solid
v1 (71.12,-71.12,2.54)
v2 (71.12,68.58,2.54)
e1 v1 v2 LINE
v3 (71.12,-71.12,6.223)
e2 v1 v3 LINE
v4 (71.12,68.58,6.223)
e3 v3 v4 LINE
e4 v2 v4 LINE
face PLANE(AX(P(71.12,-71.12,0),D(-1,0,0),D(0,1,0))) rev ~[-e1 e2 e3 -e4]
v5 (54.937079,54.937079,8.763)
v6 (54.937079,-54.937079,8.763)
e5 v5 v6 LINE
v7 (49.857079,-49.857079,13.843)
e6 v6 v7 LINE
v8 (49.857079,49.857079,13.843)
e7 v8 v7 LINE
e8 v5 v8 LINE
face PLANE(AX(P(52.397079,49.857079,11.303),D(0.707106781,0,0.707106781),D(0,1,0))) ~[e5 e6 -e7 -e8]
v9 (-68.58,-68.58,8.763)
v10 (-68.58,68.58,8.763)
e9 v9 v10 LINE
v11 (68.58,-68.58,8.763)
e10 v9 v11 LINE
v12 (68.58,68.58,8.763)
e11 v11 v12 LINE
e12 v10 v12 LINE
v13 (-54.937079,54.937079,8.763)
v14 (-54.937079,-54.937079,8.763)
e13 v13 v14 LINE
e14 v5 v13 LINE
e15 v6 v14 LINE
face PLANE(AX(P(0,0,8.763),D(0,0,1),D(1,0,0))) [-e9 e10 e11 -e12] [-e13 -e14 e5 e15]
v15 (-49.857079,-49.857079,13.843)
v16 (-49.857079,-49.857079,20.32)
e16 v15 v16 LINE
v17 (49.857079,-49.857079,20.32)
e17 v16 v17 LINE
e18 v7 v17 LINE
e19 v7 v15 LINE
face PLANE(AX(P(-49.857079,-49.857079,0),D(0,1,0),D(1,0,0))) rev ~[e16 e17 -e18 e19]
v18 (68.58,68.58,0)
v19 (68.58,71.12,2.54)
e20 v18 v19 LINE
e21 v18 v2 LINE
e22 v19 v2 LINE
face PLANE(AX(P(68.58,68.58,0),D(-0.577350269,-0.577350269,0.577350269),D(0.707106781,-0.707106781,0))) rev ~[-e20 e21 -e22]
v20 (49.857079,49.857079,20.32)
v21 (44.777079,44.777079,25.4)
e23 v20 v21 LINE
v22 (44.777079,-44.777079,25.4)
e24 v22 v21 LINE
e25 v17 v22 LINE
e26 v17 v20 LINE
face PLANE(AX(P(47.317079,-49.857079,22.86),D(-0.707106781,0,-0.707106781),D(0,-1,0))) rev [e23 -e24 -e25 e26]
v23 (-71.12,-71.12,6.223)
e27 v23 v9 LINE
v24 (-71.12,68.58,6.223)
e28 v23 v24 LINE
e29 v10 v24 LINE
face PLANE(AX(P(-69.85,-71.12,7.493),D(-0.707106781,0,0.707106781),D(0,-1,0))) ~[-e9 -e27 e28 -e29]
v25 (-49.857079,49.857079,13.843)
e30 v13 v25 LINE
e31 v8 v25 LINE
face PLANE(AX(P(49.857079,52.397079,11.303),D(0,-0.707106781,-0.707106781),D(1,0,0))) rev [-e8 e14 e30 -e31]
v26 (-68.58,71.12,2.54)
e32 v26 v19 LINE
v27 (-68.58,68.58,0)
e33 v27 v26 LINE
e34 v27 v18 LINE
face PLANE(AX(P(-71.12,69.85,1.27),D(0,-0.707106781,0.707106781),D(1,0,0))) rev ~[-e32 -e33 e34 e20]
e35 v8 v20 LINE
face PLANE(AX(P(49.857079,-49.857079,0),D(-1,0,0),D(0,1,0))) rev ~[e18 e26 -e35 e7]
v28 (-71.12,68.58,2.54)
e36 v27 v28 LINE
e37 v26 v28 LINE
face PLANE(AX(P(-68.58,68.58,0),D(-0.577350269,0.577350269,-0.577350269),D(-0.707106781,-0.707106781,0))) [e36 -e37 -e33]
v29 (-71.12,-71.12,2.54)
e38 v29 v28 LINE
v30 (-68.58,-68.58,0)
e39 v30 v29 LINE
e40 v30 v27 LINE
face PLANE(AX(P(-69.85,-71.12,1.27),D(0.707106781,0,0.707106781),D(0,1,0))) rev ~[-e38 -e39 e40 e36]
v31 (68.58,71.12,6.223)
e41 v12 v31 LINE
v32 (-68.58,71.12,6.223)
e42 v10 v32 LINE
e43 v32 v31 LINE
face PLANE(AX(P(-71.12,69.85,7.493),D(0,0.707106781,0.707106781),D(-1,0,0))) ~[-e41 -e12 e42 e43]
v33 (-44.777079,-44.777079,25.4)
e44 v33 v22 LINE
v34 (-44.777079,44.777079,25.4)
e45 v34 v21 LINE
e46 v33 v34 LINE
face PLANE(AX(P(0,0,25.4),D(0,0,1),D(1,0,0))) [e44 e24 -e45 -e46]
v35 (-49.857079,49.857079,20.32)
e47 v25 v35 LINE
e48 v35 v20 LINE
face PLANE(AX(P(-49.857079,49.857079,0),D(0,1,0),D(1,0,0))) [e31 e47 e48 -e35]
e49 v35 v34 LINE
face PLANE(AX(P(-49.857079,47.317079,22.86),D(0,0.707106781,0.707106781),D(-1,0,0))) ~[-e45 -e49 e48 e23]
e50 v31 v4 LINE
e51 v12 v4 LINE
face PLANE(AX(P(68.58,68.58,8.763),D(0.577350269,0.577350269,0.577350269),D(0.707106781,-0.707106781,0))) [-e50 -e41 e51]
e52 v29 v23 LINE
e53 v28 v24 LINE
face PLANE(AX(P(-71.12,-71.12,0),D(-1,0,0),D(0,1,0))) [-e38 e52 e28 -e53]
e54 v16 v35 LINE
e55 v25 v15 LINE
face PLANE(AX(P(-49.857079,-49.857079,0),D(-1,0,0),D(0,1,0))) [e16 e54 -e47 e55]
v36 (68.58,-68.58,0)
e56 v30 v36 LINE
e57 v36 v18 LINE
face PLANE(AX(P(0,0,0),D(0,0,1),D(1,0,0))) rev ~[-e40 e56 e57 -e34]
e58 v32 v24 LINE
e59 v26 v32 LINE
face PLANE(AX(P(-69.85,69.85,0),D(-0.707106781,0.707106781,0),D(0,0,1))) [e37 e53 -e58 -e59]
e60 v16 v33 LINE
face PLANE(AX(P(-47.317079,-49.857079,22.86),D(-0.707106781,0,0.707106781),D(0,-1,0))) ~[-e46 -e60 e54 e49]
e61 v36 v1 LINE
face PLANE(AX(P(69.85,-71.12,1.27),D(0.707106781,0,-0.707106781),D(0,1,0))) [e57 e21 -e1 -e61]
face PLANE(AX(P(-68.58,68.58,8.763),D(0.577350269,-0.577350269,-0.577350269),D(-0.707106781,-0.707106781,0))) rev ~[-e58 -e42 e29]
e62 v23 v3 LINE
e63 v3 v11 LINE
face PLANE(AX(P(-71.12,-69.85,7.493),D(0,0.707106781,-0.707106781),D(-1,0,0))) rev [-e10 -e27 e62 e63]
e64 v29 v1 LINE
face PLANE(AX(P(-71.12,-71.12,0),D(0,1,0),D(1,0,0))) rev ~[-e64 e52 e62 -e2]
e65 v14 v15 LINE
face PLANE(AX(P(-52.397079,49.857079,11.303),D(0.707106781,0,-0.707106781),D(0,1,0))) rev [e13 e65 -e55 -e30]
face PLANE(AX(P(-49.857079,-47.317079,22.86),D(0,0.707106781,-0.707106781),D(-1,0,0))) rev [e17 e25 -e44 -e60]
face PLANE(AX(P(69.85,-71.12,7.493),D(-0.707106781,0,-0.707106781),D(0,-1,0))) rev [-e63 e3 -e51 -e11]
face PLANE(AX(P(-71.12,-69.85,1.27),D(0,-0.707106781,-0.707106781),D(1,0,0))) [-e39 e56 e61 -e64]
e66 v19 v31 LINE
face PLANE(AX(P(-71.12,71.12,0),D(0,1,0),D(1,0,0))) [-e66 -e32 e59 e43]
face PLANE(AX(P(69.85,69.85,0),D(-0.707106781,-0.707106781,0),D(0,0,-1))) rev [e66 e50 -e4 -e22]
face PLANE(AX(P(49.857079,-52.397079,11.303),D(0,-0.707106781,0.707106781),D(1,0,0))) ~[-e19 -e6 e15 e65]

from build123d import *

# Parameters (mm, degrees)
F0_W     = 142.24
F0_H     = 142.24
F1_DEPTH = 8.763
F2_W     = 99.7141572639
F2_H     = 99.7141572639
F3_DEPTH = 25.4
F4_SIZE  = 2.54
F5_SIZE  = 5.08


with BuildPart() as f1:
    # F0 (on Top) → F1 (new body)
    with BuildSketch(Plane.XY):
        Rectangle(F0_W, F0_H)
    extrude(amount=F1_DEPTH)

    # F2 (on Top) → F3 (join)
    with BuildSketch(Plane.XY):
        Rectangle(F2_W, F2_H)
    extrude(amount=F3_DEPTH)

    # F4
    f4_edges = [f1.edges().sort_by_distance(p)[0] for p in [
        (71.12, 71.12, 4.3815),
        (-71.12, 71.12, 4.3815),
        (0, 71.12, 0),
        (0, 71.12, 8.763),
        (71.12, 0, 8.763),
        (71.12, 0, 0),
        (0, -71.12, 8.763),
        (0, -71.12, 0),
        (-71.12, 0, 8.763),
        (-71.12, 0, 0),
    ]]
    chamfer(f4_edges, length=F4_SIZE)

    # F5
    f5_edges = [f1.edges().sort_by_distance(p)[0] for p in [
        (-49.857079, 0, 25.4),
        (0, 49.857079, 25.4),
        (0, -49.857079, 25.4),
        (49.857079, 0, 25.4),
        (-49.857079, 0, 8.763),
        (0, 49.857079, 8.763),
        (49.857079, 0, 8.763),
        (0, -49.857079, 8.763),
    ]]
    chamfer(f5_edges, length=F5_SIZE)


solid = f1.part
